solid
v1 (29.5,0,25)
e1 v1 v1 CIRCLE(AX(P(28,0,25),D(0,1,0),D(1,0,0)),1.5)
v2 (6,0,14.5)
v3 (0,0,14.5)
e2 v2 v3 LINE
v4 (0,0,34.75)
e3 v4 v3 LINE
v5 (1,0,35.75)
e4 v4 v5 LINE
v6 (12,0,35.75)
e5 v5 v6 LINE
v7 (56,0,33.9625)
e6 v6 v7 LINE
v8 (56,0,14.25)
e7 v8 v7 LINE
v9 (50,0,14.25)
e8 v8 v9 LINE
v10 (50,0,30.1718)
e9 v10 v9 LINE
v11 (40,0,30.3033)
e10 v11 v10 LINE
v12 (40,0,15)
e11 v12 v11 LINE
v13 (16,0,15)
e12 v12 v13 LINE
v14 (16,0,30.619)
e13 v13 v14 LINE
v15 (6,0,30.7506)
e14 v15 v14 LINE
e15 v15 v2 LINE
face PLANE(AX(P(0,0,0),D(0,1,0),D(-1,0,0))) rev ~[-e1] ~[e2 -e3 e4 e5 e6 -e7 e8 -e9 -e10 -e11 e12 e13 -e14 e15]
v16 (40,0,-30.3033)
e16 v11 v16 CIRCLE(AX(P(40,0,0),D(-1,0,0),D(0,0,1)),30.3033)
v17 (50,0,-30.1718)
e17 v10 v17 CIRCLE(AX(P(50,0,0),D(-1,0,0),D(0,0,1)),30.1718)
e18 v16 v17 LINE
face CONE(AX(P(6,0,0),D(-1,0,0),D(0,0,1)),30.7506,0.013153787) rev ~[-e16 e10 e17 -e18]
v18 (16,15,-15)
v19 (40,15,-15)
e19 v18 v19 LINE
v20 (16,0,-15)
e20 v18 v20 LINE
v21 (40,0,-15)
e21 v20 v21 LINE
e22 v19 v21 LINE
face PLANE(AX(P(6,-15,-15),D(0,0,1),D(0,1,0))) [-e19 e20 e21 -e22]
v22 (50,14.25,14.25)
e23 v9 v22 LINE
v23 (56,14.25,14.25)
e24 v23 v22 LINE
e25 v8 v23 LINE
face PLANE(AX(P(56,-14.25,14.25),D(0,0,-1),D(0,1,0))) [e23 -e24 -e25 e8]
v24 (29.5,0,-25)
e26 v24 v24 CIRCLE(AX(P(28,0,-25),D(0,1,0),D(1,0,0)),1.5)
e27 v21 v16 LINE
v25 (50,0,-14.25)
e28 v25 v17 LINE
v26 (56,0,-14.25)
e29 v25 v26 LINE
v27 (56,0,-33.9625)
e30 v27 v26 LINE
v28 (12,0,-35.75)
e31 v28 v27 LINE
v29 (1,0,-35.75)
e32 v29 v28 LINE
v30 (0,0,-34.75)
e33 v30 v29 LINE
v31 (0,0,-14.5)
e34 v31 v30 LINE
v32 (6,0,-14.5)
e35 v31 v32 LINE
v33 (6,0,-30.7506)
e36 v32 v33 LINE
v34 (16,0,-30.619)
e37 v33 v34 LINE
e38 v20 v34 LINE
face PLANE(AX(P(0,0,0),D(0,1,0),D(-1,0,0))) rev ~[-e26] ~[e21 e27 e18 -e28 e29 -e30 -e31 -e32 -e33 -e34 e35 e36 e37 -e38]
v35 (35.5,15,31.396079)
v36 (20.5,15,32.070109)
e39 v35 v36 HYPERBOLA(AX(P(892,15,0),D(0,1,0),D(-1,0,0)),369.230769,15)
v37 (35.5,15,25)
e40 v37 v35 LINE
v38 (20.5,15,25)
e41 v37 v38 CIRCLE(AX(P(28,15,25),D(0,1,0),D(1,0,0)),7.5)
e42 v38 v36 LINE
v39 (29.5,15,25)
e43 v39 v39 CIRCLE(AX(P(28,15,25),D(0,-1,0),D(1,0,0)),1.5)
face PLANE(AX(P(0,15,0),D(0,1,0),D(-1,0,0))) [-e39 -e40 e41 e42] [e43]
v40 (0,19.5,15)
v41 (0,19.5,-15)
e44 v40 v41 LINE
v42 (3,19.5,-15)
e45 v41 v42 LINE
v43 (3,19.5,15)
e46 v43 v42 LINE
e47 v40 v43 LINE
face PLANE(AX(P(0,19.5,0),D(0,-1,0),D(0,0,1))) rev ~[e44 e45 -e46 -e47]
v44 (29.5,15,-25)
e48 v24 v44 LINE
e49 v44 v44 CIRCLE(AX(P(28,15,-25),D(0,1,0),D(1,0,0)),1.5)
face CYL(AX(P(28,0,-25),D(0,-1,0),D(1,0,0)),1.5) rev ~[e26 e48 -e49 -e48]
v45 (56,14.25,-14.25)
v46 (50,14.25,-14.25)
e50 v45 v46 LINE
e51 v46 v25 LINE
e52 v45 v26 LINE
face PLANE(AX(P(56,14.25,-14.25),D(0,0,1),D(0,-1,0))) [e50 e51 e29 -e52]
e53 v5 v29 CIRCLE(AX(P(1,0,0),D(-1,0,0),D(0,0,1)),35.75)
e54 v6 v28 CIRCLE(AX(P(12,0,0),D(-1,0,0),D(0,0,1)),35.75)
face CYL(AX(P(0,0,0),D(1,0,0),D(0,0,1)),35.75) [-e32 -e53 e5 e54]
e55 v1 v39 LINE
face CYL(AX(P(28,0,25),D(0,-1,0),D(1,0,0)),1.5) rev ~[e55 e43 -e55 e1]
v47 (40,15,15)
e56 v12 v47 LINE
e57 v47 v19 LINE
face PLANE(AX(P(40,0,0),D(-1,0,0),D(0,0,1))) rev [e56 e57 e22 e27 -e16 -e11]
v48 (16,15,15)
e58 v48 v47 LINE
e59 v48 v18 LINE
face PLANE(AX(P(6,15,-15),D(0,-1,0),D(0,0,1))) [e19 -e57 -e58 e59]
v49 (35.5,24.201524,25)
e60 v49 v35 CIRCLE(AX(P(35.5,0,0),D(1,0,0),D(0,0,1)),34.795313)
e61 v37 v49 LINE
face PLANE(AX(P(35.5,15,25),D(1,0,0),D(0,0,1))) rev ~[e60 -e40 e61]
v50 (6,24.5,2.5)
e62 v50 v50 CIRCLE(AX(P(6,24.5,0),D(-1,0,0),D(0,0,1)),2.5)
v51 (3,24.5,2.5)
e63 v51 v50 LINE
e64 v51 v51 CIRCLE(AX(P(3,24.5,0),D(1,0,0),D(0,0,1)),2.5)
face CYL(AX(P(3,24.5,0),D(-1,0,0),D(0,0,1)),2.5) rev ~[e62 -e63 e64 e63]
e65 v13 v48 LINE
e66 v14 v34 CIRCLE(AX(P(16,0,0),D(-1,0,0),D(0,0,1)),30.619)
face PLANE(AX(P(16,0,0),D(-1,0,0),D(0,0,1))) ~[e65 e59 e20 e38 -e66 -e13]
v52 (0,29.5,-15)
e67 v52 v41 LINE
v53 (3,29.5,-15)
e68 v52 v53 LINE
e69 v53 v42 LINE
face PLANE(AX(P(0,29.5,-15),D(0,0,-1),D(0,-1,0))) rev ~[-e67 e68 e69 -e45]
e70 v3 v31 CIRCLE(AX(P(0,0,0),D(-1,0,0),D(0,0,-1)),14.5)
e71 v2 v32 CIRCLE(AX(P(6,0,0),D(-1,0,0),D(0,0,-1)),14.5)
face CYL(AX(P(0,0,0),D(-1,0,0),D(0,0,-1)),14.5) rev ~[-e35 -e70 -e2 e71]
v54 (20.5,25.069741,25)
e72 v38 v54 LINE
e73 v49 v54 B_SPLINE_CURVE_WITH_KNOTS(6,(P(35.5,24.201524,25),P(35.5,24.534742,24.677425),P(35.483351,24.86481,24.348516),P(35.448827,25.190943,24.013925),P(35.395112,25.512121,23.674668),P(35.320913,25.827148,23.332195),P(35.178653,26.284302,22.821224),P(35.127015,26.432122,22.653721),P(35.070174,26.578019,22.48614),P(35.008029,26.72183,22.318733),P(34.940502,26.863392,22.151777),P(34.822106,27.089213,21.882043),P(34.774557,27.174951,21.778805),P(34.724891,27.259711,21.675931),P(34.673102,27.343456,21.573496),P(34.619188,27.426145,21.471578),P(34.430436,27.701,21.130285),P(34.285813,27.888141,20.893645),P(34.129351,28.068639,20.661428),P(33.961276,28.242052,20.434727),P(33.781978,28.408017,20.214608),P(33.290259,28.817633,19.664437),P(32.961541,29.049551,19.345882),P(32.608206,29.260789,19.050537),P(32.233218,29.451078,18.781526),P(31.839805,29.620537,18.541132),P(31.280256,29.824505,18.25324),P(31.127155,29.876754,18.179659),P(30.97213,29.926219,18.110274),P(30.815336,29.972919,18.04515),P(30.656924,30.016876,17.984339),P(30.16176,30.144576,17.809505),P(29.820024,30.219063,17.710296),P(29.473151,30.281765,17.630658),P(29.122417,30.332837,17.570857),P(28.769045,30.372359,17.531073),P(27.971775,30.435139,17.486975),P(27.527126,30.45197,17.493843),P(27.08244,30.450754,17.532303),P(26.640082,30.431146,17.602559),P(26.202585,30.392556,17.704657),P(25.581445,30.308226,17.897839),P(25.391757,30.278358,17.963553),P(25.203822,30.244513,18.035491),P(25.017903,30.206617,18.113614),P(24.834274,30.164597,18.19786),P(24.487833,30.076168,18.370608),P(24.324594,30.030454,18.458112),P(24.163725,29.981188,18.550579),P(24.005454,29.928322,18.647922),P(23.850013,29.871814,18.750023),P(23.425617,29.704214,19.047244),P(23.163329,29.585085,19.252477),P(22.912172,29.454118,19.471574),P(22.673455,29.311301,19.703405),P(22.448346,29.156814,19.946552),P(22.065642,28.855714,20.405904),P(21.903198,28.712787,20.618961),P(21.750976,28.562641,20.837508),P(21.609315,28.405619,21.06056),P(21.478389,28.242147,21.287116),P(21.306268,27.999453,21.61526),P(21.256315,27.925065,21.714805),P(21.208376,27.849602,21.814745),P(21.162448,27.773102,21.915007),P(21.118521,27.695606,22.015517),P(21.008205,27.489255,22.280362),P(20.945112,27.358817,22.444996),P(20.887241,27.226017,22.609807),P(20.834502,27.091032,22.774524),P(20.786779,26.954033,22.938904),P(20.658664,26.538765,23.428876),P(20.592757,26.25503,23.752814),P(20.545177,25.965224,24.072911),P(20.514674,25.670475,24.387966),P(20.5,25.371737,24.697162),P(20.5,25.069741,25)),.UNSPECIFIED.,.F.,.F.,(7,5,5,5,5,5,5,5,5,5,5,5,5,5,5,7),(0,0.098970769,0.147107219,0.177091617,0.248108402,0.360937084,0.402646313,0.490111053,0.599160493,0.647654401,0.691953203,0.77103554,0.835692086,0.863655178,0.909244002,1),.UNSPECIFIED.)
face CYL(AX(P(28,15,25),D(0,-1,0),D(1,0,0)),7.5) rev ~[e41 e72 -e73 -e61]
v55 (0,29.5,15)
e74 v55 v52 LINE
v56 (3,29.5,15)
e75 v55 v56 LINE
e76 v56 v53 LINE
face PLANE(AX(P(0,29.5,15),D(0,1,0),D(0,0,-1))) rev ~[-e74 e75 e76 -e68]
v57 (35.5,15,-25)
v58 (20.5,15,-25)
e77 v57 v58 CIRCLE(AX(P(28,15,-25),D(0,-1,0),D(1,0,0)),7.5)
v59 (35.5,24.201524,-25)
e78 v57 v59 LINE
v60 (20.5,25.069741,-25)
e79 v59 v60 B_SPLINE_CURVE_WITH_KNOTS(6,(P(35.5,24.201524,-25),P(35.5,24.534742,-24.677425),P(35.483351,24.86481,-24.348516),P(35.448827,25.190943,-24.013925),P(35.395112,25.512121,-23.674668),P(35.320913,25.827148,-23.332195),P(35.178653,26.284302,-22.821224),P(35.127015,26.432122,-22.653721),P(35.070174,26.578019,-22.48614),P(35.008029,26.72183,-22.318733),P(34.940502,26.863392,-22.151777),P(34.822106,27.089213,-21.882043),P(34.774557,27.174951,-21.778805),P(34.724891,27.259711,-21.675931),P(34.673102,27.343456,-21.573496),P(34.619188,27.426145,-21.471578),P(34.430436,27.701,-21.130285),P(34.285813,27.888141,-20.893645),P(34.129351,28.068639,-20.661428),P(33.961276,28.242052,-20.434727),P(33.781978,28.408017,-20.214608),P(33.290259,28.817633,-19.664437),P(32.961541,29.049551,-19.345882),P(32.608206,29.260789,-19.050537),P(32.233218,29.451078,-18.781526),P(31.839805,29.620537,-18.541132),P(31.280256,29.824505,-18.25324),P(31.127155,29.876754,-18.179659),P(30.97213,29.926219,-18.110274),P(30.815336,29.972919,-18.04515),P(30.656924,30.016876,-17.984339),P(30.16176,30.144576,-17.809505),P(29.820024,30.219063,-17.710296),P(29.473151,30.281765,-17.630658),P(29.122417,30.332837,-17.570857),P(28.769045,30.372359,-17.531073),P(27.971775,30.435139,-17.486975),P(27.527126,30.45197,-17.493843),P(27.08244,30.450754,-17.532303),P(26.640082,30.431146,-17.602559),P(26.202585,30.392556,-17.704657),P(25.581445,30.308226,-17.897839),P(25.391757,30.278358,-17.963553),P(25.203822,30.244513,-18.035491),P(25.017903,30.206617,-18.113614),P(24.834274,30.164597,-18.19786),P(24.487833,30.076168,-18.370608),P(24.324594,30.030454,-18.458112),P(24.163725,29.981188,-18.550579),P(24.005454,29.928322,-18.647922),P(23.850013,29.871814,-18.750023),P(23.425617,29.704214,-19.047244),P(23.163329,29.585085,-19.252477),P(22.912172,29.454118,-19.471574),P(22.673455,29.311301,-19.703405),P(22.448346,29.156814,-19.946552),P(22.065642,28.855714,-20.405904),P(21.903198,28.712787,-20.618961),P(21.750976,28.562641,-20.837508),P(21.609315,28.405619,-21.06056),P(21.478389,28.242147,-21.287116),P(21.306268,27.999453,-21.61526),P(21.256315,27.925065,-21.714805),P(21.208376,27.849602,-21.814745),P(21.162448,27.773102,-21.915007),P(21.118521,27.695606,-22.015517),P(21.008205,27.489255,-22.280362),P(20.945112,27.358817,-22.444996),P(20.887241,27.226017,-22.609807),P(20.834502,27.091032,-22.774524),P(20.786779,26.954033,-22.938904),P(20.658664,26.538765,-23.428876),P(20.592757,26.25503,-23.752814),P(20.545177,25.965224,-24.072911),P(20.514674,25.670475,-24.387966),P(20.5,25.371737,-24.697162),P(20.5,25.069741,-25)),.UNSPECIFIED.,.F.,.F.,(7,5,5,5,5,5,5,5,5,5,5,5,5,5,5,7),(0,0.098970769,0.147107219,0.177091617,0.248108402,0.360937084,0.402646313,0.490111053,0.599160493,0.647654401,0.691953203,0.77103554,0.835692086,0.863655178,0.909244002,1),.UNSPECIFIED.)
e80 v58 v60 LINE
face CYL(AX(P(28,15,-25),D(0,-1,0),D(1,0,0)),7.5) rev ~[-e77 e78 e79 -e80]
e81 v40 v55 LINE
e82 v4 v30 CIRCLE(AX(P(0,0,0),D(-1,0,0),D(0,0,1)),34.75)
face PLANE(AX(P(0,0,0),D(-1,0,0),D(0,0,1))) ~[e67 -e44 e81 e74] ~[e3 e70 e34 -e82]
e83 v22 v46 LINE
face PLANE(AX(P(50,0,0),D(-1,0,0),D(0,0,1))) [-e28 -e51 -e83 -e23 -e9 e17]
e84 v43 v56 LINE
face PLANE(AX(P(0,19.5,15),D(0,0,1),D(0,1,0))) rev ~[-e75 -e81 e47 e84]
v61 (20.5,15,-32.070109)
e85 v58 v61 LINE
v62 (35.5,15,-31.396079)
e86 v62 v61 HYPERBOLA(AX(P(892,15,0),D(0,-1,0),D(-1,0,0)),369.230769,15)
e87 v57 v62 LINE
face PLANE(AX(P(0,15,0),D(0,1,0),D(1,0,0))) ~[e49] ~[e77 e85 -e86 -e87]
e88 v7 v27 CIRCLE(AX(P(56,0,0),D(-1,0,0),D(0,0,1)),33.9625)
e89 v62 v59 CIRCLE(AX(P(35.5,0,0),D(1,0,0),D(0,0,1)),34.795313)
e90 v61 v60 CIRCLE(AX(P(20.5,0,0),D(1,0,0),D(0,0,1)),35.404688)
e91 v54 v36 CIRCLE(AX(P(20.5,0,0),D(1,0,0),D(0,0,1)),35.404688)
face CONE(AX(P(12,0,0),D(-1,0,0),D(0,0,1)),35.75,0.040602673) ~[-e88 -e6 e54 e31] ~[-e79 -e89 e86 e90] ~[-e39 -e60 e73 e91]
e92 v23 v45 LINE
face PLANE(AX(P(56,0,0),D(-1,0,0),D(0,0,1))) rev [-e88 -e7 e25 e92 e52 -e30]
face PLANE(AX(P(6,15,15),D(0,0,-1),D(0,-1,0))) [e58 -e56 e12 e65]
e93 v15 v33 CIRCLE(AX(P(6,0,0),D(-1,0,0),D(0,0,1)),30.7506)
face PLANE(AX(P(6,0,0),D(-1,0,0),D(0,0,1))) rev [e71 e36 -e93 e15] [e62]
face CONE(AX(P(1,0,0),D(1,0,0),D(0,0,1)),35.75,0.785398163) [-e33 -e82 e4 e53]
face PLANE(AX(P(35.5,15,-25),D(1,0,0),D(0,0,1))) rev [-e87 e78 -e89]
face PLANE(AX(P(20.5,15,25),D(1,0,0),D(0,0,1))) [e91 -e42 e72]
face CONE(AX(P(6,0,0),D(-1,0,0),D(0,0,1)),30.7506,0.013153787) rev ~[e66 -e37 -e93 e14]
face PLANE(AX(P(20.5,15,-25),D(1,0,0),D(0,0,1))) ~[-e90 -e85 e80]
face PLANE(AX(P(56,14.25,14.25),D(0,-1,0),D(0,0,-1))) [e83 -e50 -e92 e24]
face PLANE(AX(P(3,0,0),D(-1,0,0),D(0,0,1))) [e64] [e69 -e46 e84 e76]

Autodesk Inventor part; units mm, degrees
ref_plane "YZ Plane" through (0, 0, 0) normal (1, 0, 0) x (0, 1, 0)
sketch "Sketch1" plane through (0, 0, 0) normal (0, 1, 0) x (-1, 0, 0)
  line L0 (0, 0) -> (0, 35.75)
  line L1 (0, 0) -> (-56, 0)
  line L2 (-56, 0) -> (-56, 33.9625)
  line L3 (11.2, 0) -> (-67.2, 0) projected
  line L4 (-50, 30.1718) -> (-50, 6)
  line L5 (-6, 6) -> (-6, 30.7506)
  line L6 (-6, 30.7506) -> (-50, 30.1718)
  line L7 (-28, 0) -> (-28, 30.4612)
  line L8 (-16, 0) -> (-16, 30.619)
  line L9 (-40, 0) -> (-40, 30.3033)
  line L10 (-50, 6) -> (-40, 6)
  line L11 (-16, 6) -> (-6, 6)
  line L12 (0, 35.75) -> (-12, 35.75)
  line L13 (-12, 35.75) -> (-56, 33.9625)
  dimension "d1" = 33.9625
  dimension "d8" = 35.75
  dimension "d10" = 56
  dimension "d22" = 28
  dimension "d23" = 12
  dimension "d24" = 12
  dimension "d29" = 12
revolve "Revolution1" add sketch "Sketch1" angle 180 about axis through (-10, 0, 0) along (-1, 0, 0) contours L1 L8 L11 L5 L6 L4 L10 L9 L2 L13 L12 L0 | L1 L7 L6 L8 | L1 L9 L6 L7
ref_plane "Work Plane1" through (6, 0, 0) normal (-1, 0, 0) x (0, 0, -1)
sketch "Sketch3" plane through (6, 0, 0) normal (-1, 0, 0) x (0, 0, -1)
  line L0 (-15, 15) -> (15, 15)
  line L1 (15, 15) -> (15, -15)
  line L2 (15, -15) -> (-15, -15)
  line L3 (-15, -15) -> (-15, 15)
  line L4 (-15, 15) -> (15, -15) construction
  line L5 (15, 15) -> (-15, -15) construction
  point P0 (0, 0)
  dimension "d12" = 30
  dimension "d13" = 30
extrude "Extrusion2" cut sketch "Sketch3" against normal blind 44
sketch "Sketch4" plane through (0, 0, 0) normal (-1, 0, 0) x (0, 0, -1)
  circle A0 centre (0, 0) radius 14.5
  point P0 (0, 0)
  dimension "d16" = 29
extrude "Extrusion3" cut sketch "Sketch4" against normal blind 6
sketch "Sketch5" plane through (56, 0, 0) normal (1, 0, 0) x (0, 0, -1)
  line L0 (14.25, -14.25) -> (-14.25, -14.25)
  line L1 (-14.25, -14.25) -> (-14.25, 14.25)
  line L2 (-14.25, 14.25) -> (14.25, 14.25)
  line L3 (14.25, 14.25) -> (14.25, -14.25)
  line L4 (14.25, -14.25) -> (-14.25, 14.25) construction
  line L5 (-14.25, -14.25) -> (14.25, 14.25) construction
  point P0 (0, 0)
  dimension "d25" = 28.5
  dimension "d26" = 28.5
extrude "Extrusion4" cut sketch "Sketch5" against normal blind 6
chamfer "Chamfer3" distance 1 angle 45 1 edges at (0, 35.75, 0)
sketch "Sketch6" plane through (16, 0, 15) normal (0, -1, 0) x (1, 0, 0)
  line L0 (-16, 19.75) -> (-15, 20.75) projected
  line L1 (-16, -0.5) -> (-16, 19.75) projected
  line L2 (-16, -0.5) -> (-10, -0.5) projected
  line L3 (-10, -0.5) -> (-10, 15.7506) projected
  line L4 (-10, 15.7506) -> (0, 15.619) projected
  line L5 (0, 15.619) -> (0, 0) projected
  line L6 (0, 0) -> (24, 0) projected
  line L7 (24, 0) -> (24, 15.3033) projected
  line L8 (24, 15.3033) -> (34, 15.1718) projected
  line L9 (34, 15.1718) -> (34, -0.75) projected
  line L10 (34, -0.75) -> (40, -0.75) projected
  line L11 (40, 18.9625) -> (40, -0.75) projected
  line L12 (-4, 20.75) -> (40, 18.9625) projected
  line L13 (-15, 20.75) -> (-4, 20.75) projected
  line L14 (-16, -15) -> (40, -15)
  line L15 (40, -0.75) -> (40, -29.25) projected
  line L16 (13, -15) -> (38, -15) construction
  line L17 (12, -15) -> (12, 10)
  line L18 (12, -15) -> (37, -15) construction
  circle A0 centre (12, 10) radius 1.5
  dimension "d46" = 25
  dimension "d47" = 90
  dimension "d48" = 3
extrude "Extrusion5" cut sketch "Sketch6" against normal through all contours A0
ref_plane "Work Plane2" through (0, 15, 0) normal (0, 1, 0) x (-1, 0, 0)
sketch "Sketch7" plane through (0, 15, 0) normal (0, 1, 0) x (-1, 0, 0)
  circle A0 centre (-28, 25) radius 1.5 projected
  arc A1 (-35.5, 25) -> (-20.5, 25) centre (-28, 25) ccw
  spline S0 degree 5 poles (-29.5, 25) (-29.5, 25.2111) (-29.4629, 25.4204) (-29.3897, 25.6231) (-29.2804, 25.8128) (-29.0332, 26.0983) (-28.9152, 26.2048) (-28.7791, 26.2979) (-28.6269, 26.3735) (-28.3307, 26.4697) (-28.1905, 26.4982) (-28.0469, 26.5095) (-27.9041, 26.5034) (-27.5429, 26.4465) (-27.3324, 26.3699) (-27.1499, 26.2607) (-26.9942, 26.1299) (-26.7049, 25.7958) (-26.5873, 25.5835) (-26.513, 25.3527) (-26.4842, 25.1114) (-26.5242, 24.6611) (-26.578, 24.4533) (-26.6719, 24.2502) (-26.8064, 24.0618) (-27.1556, 23.7366) (-27.3724, 23.6017) (-27.6224, 23.5132) (-27.8827, 23.4833) (-28.3338, 23.524) (-28.5277, 23.5752) (-28.7076, 23.6563) (-28.8674, 23.7623) (-29.2025, 24.0647) (-29.3531, 24.2808) (-29.4523, 24.5167) (-29.5, 24.7592) (-29.5, 25) knots 0 0 0 0 0 0 0.12181 0.12181 0.12181 0.12181 0.205743 0.205743 0.205743 0.205743 0.273981 0.273981 0.273981 0.273981 0.384852 0.384852 0.384852 0.384852 0.524069 0.524069 0.524069 0.524069 0.641928 0.641928 0.641928 0.641928 0.764397 0.764397 0.764397 0.764397 0.86105 0.86105 0.86105 0.86105 1 1 1 1 1 1 projected
  line L0 (-12, 35.75) -> (-56, 33.9625) projected
  line L1 (-56, 33.9625) -> (-56, -33.9625) projected
  line L2 (-12, -35.75) -> (-56, -33.9625) projected
  line L3 (-12, 35.75) -> (-12, -35.75) projected
  line L4 (-20.5, 25) -> (-20.5, 35.4047)
  line L5 (-35.5, 25) -> (-35.5, 34.7953)
  point P0 (0, 0)
  dimension "d50" = 15
extrude "Extrusion7" cut sketch "Sketch7" along normal blind 40 contours L5 L0 L4 A1
sketch "Sketch8" plane through (0, 0, 0) normal (-1, 0, 0) x (0, 0, 1)
  line L0 (0, 0) -> (0, 19.5)
  line L1 (0, 19.5) -> (15, 19.5)
  line L2 (15, 19.5) -> (15, 29.5)
  line L3 (15, 29.5) -> (-15, 29.5)
  line L4 (-15, 29.5) -> (-15, 19.5)
  line L5 (-15, 19.5) -> (0, 19.5)
  dimension "d61" = 19.5
  dimension "d62" = 15
  dimension "d63" = 10
  dimension "d64" = 30
  dimension "d65" = 90
  dimension "d66" = 10
extrude "Extrusion8" cut sketch "Sketch8" against normal blind 3
mirror "Mirror3" about plane through (0, 0, 0) normal (0, 0, 1) of "Extrusion5", "Extrusion7"
sketch "Sketch10" plane through (3, 0, 0) normal (-1, 0, 0) x (0, 0, 1)
  line L0 (15, 19.5) -> (-15, 19.5) projected
  line L1 (15, 29.5) -> (15, 19.5) projected
  line L2 (-15, 29.5) -> (15, 29.5) projected
  line L3 (-15, 19.5) -> (-15, 29.5) projected
  line L4 (-15, 19.5) -> (-15, 29.5) projected
  line L5 (-15, 19.5) -> (15, 29.5)
  circle A0 centre (0, 24.5) radius 2.5
  point P0 (0, 0)
  dimension "d67" = 5
extrude "Extrusion9" cut sketch "Sketch10" against normal up to next contours A0 L5 | L5 A0
equation "\"d8\" = 0.5 * pipeID"
equation "\"d22\" = 0.5 * d10"
equation "\"d23\" = 2 * wallTh"
equation "\"d24\" = 2 * wallTh"
equation "\"d29\" = 2 * wallTh"
equation "\"d17\" = wallTh"
equation "\"d27\" = wallTh"
equation "\"pipeID\" = 71.5"
equation "\"wallTh\" = 6"
equation "\"taper\" = 0.95"
equation "\"d11\" = -wallTh"
properties part number "cameraHolder"
